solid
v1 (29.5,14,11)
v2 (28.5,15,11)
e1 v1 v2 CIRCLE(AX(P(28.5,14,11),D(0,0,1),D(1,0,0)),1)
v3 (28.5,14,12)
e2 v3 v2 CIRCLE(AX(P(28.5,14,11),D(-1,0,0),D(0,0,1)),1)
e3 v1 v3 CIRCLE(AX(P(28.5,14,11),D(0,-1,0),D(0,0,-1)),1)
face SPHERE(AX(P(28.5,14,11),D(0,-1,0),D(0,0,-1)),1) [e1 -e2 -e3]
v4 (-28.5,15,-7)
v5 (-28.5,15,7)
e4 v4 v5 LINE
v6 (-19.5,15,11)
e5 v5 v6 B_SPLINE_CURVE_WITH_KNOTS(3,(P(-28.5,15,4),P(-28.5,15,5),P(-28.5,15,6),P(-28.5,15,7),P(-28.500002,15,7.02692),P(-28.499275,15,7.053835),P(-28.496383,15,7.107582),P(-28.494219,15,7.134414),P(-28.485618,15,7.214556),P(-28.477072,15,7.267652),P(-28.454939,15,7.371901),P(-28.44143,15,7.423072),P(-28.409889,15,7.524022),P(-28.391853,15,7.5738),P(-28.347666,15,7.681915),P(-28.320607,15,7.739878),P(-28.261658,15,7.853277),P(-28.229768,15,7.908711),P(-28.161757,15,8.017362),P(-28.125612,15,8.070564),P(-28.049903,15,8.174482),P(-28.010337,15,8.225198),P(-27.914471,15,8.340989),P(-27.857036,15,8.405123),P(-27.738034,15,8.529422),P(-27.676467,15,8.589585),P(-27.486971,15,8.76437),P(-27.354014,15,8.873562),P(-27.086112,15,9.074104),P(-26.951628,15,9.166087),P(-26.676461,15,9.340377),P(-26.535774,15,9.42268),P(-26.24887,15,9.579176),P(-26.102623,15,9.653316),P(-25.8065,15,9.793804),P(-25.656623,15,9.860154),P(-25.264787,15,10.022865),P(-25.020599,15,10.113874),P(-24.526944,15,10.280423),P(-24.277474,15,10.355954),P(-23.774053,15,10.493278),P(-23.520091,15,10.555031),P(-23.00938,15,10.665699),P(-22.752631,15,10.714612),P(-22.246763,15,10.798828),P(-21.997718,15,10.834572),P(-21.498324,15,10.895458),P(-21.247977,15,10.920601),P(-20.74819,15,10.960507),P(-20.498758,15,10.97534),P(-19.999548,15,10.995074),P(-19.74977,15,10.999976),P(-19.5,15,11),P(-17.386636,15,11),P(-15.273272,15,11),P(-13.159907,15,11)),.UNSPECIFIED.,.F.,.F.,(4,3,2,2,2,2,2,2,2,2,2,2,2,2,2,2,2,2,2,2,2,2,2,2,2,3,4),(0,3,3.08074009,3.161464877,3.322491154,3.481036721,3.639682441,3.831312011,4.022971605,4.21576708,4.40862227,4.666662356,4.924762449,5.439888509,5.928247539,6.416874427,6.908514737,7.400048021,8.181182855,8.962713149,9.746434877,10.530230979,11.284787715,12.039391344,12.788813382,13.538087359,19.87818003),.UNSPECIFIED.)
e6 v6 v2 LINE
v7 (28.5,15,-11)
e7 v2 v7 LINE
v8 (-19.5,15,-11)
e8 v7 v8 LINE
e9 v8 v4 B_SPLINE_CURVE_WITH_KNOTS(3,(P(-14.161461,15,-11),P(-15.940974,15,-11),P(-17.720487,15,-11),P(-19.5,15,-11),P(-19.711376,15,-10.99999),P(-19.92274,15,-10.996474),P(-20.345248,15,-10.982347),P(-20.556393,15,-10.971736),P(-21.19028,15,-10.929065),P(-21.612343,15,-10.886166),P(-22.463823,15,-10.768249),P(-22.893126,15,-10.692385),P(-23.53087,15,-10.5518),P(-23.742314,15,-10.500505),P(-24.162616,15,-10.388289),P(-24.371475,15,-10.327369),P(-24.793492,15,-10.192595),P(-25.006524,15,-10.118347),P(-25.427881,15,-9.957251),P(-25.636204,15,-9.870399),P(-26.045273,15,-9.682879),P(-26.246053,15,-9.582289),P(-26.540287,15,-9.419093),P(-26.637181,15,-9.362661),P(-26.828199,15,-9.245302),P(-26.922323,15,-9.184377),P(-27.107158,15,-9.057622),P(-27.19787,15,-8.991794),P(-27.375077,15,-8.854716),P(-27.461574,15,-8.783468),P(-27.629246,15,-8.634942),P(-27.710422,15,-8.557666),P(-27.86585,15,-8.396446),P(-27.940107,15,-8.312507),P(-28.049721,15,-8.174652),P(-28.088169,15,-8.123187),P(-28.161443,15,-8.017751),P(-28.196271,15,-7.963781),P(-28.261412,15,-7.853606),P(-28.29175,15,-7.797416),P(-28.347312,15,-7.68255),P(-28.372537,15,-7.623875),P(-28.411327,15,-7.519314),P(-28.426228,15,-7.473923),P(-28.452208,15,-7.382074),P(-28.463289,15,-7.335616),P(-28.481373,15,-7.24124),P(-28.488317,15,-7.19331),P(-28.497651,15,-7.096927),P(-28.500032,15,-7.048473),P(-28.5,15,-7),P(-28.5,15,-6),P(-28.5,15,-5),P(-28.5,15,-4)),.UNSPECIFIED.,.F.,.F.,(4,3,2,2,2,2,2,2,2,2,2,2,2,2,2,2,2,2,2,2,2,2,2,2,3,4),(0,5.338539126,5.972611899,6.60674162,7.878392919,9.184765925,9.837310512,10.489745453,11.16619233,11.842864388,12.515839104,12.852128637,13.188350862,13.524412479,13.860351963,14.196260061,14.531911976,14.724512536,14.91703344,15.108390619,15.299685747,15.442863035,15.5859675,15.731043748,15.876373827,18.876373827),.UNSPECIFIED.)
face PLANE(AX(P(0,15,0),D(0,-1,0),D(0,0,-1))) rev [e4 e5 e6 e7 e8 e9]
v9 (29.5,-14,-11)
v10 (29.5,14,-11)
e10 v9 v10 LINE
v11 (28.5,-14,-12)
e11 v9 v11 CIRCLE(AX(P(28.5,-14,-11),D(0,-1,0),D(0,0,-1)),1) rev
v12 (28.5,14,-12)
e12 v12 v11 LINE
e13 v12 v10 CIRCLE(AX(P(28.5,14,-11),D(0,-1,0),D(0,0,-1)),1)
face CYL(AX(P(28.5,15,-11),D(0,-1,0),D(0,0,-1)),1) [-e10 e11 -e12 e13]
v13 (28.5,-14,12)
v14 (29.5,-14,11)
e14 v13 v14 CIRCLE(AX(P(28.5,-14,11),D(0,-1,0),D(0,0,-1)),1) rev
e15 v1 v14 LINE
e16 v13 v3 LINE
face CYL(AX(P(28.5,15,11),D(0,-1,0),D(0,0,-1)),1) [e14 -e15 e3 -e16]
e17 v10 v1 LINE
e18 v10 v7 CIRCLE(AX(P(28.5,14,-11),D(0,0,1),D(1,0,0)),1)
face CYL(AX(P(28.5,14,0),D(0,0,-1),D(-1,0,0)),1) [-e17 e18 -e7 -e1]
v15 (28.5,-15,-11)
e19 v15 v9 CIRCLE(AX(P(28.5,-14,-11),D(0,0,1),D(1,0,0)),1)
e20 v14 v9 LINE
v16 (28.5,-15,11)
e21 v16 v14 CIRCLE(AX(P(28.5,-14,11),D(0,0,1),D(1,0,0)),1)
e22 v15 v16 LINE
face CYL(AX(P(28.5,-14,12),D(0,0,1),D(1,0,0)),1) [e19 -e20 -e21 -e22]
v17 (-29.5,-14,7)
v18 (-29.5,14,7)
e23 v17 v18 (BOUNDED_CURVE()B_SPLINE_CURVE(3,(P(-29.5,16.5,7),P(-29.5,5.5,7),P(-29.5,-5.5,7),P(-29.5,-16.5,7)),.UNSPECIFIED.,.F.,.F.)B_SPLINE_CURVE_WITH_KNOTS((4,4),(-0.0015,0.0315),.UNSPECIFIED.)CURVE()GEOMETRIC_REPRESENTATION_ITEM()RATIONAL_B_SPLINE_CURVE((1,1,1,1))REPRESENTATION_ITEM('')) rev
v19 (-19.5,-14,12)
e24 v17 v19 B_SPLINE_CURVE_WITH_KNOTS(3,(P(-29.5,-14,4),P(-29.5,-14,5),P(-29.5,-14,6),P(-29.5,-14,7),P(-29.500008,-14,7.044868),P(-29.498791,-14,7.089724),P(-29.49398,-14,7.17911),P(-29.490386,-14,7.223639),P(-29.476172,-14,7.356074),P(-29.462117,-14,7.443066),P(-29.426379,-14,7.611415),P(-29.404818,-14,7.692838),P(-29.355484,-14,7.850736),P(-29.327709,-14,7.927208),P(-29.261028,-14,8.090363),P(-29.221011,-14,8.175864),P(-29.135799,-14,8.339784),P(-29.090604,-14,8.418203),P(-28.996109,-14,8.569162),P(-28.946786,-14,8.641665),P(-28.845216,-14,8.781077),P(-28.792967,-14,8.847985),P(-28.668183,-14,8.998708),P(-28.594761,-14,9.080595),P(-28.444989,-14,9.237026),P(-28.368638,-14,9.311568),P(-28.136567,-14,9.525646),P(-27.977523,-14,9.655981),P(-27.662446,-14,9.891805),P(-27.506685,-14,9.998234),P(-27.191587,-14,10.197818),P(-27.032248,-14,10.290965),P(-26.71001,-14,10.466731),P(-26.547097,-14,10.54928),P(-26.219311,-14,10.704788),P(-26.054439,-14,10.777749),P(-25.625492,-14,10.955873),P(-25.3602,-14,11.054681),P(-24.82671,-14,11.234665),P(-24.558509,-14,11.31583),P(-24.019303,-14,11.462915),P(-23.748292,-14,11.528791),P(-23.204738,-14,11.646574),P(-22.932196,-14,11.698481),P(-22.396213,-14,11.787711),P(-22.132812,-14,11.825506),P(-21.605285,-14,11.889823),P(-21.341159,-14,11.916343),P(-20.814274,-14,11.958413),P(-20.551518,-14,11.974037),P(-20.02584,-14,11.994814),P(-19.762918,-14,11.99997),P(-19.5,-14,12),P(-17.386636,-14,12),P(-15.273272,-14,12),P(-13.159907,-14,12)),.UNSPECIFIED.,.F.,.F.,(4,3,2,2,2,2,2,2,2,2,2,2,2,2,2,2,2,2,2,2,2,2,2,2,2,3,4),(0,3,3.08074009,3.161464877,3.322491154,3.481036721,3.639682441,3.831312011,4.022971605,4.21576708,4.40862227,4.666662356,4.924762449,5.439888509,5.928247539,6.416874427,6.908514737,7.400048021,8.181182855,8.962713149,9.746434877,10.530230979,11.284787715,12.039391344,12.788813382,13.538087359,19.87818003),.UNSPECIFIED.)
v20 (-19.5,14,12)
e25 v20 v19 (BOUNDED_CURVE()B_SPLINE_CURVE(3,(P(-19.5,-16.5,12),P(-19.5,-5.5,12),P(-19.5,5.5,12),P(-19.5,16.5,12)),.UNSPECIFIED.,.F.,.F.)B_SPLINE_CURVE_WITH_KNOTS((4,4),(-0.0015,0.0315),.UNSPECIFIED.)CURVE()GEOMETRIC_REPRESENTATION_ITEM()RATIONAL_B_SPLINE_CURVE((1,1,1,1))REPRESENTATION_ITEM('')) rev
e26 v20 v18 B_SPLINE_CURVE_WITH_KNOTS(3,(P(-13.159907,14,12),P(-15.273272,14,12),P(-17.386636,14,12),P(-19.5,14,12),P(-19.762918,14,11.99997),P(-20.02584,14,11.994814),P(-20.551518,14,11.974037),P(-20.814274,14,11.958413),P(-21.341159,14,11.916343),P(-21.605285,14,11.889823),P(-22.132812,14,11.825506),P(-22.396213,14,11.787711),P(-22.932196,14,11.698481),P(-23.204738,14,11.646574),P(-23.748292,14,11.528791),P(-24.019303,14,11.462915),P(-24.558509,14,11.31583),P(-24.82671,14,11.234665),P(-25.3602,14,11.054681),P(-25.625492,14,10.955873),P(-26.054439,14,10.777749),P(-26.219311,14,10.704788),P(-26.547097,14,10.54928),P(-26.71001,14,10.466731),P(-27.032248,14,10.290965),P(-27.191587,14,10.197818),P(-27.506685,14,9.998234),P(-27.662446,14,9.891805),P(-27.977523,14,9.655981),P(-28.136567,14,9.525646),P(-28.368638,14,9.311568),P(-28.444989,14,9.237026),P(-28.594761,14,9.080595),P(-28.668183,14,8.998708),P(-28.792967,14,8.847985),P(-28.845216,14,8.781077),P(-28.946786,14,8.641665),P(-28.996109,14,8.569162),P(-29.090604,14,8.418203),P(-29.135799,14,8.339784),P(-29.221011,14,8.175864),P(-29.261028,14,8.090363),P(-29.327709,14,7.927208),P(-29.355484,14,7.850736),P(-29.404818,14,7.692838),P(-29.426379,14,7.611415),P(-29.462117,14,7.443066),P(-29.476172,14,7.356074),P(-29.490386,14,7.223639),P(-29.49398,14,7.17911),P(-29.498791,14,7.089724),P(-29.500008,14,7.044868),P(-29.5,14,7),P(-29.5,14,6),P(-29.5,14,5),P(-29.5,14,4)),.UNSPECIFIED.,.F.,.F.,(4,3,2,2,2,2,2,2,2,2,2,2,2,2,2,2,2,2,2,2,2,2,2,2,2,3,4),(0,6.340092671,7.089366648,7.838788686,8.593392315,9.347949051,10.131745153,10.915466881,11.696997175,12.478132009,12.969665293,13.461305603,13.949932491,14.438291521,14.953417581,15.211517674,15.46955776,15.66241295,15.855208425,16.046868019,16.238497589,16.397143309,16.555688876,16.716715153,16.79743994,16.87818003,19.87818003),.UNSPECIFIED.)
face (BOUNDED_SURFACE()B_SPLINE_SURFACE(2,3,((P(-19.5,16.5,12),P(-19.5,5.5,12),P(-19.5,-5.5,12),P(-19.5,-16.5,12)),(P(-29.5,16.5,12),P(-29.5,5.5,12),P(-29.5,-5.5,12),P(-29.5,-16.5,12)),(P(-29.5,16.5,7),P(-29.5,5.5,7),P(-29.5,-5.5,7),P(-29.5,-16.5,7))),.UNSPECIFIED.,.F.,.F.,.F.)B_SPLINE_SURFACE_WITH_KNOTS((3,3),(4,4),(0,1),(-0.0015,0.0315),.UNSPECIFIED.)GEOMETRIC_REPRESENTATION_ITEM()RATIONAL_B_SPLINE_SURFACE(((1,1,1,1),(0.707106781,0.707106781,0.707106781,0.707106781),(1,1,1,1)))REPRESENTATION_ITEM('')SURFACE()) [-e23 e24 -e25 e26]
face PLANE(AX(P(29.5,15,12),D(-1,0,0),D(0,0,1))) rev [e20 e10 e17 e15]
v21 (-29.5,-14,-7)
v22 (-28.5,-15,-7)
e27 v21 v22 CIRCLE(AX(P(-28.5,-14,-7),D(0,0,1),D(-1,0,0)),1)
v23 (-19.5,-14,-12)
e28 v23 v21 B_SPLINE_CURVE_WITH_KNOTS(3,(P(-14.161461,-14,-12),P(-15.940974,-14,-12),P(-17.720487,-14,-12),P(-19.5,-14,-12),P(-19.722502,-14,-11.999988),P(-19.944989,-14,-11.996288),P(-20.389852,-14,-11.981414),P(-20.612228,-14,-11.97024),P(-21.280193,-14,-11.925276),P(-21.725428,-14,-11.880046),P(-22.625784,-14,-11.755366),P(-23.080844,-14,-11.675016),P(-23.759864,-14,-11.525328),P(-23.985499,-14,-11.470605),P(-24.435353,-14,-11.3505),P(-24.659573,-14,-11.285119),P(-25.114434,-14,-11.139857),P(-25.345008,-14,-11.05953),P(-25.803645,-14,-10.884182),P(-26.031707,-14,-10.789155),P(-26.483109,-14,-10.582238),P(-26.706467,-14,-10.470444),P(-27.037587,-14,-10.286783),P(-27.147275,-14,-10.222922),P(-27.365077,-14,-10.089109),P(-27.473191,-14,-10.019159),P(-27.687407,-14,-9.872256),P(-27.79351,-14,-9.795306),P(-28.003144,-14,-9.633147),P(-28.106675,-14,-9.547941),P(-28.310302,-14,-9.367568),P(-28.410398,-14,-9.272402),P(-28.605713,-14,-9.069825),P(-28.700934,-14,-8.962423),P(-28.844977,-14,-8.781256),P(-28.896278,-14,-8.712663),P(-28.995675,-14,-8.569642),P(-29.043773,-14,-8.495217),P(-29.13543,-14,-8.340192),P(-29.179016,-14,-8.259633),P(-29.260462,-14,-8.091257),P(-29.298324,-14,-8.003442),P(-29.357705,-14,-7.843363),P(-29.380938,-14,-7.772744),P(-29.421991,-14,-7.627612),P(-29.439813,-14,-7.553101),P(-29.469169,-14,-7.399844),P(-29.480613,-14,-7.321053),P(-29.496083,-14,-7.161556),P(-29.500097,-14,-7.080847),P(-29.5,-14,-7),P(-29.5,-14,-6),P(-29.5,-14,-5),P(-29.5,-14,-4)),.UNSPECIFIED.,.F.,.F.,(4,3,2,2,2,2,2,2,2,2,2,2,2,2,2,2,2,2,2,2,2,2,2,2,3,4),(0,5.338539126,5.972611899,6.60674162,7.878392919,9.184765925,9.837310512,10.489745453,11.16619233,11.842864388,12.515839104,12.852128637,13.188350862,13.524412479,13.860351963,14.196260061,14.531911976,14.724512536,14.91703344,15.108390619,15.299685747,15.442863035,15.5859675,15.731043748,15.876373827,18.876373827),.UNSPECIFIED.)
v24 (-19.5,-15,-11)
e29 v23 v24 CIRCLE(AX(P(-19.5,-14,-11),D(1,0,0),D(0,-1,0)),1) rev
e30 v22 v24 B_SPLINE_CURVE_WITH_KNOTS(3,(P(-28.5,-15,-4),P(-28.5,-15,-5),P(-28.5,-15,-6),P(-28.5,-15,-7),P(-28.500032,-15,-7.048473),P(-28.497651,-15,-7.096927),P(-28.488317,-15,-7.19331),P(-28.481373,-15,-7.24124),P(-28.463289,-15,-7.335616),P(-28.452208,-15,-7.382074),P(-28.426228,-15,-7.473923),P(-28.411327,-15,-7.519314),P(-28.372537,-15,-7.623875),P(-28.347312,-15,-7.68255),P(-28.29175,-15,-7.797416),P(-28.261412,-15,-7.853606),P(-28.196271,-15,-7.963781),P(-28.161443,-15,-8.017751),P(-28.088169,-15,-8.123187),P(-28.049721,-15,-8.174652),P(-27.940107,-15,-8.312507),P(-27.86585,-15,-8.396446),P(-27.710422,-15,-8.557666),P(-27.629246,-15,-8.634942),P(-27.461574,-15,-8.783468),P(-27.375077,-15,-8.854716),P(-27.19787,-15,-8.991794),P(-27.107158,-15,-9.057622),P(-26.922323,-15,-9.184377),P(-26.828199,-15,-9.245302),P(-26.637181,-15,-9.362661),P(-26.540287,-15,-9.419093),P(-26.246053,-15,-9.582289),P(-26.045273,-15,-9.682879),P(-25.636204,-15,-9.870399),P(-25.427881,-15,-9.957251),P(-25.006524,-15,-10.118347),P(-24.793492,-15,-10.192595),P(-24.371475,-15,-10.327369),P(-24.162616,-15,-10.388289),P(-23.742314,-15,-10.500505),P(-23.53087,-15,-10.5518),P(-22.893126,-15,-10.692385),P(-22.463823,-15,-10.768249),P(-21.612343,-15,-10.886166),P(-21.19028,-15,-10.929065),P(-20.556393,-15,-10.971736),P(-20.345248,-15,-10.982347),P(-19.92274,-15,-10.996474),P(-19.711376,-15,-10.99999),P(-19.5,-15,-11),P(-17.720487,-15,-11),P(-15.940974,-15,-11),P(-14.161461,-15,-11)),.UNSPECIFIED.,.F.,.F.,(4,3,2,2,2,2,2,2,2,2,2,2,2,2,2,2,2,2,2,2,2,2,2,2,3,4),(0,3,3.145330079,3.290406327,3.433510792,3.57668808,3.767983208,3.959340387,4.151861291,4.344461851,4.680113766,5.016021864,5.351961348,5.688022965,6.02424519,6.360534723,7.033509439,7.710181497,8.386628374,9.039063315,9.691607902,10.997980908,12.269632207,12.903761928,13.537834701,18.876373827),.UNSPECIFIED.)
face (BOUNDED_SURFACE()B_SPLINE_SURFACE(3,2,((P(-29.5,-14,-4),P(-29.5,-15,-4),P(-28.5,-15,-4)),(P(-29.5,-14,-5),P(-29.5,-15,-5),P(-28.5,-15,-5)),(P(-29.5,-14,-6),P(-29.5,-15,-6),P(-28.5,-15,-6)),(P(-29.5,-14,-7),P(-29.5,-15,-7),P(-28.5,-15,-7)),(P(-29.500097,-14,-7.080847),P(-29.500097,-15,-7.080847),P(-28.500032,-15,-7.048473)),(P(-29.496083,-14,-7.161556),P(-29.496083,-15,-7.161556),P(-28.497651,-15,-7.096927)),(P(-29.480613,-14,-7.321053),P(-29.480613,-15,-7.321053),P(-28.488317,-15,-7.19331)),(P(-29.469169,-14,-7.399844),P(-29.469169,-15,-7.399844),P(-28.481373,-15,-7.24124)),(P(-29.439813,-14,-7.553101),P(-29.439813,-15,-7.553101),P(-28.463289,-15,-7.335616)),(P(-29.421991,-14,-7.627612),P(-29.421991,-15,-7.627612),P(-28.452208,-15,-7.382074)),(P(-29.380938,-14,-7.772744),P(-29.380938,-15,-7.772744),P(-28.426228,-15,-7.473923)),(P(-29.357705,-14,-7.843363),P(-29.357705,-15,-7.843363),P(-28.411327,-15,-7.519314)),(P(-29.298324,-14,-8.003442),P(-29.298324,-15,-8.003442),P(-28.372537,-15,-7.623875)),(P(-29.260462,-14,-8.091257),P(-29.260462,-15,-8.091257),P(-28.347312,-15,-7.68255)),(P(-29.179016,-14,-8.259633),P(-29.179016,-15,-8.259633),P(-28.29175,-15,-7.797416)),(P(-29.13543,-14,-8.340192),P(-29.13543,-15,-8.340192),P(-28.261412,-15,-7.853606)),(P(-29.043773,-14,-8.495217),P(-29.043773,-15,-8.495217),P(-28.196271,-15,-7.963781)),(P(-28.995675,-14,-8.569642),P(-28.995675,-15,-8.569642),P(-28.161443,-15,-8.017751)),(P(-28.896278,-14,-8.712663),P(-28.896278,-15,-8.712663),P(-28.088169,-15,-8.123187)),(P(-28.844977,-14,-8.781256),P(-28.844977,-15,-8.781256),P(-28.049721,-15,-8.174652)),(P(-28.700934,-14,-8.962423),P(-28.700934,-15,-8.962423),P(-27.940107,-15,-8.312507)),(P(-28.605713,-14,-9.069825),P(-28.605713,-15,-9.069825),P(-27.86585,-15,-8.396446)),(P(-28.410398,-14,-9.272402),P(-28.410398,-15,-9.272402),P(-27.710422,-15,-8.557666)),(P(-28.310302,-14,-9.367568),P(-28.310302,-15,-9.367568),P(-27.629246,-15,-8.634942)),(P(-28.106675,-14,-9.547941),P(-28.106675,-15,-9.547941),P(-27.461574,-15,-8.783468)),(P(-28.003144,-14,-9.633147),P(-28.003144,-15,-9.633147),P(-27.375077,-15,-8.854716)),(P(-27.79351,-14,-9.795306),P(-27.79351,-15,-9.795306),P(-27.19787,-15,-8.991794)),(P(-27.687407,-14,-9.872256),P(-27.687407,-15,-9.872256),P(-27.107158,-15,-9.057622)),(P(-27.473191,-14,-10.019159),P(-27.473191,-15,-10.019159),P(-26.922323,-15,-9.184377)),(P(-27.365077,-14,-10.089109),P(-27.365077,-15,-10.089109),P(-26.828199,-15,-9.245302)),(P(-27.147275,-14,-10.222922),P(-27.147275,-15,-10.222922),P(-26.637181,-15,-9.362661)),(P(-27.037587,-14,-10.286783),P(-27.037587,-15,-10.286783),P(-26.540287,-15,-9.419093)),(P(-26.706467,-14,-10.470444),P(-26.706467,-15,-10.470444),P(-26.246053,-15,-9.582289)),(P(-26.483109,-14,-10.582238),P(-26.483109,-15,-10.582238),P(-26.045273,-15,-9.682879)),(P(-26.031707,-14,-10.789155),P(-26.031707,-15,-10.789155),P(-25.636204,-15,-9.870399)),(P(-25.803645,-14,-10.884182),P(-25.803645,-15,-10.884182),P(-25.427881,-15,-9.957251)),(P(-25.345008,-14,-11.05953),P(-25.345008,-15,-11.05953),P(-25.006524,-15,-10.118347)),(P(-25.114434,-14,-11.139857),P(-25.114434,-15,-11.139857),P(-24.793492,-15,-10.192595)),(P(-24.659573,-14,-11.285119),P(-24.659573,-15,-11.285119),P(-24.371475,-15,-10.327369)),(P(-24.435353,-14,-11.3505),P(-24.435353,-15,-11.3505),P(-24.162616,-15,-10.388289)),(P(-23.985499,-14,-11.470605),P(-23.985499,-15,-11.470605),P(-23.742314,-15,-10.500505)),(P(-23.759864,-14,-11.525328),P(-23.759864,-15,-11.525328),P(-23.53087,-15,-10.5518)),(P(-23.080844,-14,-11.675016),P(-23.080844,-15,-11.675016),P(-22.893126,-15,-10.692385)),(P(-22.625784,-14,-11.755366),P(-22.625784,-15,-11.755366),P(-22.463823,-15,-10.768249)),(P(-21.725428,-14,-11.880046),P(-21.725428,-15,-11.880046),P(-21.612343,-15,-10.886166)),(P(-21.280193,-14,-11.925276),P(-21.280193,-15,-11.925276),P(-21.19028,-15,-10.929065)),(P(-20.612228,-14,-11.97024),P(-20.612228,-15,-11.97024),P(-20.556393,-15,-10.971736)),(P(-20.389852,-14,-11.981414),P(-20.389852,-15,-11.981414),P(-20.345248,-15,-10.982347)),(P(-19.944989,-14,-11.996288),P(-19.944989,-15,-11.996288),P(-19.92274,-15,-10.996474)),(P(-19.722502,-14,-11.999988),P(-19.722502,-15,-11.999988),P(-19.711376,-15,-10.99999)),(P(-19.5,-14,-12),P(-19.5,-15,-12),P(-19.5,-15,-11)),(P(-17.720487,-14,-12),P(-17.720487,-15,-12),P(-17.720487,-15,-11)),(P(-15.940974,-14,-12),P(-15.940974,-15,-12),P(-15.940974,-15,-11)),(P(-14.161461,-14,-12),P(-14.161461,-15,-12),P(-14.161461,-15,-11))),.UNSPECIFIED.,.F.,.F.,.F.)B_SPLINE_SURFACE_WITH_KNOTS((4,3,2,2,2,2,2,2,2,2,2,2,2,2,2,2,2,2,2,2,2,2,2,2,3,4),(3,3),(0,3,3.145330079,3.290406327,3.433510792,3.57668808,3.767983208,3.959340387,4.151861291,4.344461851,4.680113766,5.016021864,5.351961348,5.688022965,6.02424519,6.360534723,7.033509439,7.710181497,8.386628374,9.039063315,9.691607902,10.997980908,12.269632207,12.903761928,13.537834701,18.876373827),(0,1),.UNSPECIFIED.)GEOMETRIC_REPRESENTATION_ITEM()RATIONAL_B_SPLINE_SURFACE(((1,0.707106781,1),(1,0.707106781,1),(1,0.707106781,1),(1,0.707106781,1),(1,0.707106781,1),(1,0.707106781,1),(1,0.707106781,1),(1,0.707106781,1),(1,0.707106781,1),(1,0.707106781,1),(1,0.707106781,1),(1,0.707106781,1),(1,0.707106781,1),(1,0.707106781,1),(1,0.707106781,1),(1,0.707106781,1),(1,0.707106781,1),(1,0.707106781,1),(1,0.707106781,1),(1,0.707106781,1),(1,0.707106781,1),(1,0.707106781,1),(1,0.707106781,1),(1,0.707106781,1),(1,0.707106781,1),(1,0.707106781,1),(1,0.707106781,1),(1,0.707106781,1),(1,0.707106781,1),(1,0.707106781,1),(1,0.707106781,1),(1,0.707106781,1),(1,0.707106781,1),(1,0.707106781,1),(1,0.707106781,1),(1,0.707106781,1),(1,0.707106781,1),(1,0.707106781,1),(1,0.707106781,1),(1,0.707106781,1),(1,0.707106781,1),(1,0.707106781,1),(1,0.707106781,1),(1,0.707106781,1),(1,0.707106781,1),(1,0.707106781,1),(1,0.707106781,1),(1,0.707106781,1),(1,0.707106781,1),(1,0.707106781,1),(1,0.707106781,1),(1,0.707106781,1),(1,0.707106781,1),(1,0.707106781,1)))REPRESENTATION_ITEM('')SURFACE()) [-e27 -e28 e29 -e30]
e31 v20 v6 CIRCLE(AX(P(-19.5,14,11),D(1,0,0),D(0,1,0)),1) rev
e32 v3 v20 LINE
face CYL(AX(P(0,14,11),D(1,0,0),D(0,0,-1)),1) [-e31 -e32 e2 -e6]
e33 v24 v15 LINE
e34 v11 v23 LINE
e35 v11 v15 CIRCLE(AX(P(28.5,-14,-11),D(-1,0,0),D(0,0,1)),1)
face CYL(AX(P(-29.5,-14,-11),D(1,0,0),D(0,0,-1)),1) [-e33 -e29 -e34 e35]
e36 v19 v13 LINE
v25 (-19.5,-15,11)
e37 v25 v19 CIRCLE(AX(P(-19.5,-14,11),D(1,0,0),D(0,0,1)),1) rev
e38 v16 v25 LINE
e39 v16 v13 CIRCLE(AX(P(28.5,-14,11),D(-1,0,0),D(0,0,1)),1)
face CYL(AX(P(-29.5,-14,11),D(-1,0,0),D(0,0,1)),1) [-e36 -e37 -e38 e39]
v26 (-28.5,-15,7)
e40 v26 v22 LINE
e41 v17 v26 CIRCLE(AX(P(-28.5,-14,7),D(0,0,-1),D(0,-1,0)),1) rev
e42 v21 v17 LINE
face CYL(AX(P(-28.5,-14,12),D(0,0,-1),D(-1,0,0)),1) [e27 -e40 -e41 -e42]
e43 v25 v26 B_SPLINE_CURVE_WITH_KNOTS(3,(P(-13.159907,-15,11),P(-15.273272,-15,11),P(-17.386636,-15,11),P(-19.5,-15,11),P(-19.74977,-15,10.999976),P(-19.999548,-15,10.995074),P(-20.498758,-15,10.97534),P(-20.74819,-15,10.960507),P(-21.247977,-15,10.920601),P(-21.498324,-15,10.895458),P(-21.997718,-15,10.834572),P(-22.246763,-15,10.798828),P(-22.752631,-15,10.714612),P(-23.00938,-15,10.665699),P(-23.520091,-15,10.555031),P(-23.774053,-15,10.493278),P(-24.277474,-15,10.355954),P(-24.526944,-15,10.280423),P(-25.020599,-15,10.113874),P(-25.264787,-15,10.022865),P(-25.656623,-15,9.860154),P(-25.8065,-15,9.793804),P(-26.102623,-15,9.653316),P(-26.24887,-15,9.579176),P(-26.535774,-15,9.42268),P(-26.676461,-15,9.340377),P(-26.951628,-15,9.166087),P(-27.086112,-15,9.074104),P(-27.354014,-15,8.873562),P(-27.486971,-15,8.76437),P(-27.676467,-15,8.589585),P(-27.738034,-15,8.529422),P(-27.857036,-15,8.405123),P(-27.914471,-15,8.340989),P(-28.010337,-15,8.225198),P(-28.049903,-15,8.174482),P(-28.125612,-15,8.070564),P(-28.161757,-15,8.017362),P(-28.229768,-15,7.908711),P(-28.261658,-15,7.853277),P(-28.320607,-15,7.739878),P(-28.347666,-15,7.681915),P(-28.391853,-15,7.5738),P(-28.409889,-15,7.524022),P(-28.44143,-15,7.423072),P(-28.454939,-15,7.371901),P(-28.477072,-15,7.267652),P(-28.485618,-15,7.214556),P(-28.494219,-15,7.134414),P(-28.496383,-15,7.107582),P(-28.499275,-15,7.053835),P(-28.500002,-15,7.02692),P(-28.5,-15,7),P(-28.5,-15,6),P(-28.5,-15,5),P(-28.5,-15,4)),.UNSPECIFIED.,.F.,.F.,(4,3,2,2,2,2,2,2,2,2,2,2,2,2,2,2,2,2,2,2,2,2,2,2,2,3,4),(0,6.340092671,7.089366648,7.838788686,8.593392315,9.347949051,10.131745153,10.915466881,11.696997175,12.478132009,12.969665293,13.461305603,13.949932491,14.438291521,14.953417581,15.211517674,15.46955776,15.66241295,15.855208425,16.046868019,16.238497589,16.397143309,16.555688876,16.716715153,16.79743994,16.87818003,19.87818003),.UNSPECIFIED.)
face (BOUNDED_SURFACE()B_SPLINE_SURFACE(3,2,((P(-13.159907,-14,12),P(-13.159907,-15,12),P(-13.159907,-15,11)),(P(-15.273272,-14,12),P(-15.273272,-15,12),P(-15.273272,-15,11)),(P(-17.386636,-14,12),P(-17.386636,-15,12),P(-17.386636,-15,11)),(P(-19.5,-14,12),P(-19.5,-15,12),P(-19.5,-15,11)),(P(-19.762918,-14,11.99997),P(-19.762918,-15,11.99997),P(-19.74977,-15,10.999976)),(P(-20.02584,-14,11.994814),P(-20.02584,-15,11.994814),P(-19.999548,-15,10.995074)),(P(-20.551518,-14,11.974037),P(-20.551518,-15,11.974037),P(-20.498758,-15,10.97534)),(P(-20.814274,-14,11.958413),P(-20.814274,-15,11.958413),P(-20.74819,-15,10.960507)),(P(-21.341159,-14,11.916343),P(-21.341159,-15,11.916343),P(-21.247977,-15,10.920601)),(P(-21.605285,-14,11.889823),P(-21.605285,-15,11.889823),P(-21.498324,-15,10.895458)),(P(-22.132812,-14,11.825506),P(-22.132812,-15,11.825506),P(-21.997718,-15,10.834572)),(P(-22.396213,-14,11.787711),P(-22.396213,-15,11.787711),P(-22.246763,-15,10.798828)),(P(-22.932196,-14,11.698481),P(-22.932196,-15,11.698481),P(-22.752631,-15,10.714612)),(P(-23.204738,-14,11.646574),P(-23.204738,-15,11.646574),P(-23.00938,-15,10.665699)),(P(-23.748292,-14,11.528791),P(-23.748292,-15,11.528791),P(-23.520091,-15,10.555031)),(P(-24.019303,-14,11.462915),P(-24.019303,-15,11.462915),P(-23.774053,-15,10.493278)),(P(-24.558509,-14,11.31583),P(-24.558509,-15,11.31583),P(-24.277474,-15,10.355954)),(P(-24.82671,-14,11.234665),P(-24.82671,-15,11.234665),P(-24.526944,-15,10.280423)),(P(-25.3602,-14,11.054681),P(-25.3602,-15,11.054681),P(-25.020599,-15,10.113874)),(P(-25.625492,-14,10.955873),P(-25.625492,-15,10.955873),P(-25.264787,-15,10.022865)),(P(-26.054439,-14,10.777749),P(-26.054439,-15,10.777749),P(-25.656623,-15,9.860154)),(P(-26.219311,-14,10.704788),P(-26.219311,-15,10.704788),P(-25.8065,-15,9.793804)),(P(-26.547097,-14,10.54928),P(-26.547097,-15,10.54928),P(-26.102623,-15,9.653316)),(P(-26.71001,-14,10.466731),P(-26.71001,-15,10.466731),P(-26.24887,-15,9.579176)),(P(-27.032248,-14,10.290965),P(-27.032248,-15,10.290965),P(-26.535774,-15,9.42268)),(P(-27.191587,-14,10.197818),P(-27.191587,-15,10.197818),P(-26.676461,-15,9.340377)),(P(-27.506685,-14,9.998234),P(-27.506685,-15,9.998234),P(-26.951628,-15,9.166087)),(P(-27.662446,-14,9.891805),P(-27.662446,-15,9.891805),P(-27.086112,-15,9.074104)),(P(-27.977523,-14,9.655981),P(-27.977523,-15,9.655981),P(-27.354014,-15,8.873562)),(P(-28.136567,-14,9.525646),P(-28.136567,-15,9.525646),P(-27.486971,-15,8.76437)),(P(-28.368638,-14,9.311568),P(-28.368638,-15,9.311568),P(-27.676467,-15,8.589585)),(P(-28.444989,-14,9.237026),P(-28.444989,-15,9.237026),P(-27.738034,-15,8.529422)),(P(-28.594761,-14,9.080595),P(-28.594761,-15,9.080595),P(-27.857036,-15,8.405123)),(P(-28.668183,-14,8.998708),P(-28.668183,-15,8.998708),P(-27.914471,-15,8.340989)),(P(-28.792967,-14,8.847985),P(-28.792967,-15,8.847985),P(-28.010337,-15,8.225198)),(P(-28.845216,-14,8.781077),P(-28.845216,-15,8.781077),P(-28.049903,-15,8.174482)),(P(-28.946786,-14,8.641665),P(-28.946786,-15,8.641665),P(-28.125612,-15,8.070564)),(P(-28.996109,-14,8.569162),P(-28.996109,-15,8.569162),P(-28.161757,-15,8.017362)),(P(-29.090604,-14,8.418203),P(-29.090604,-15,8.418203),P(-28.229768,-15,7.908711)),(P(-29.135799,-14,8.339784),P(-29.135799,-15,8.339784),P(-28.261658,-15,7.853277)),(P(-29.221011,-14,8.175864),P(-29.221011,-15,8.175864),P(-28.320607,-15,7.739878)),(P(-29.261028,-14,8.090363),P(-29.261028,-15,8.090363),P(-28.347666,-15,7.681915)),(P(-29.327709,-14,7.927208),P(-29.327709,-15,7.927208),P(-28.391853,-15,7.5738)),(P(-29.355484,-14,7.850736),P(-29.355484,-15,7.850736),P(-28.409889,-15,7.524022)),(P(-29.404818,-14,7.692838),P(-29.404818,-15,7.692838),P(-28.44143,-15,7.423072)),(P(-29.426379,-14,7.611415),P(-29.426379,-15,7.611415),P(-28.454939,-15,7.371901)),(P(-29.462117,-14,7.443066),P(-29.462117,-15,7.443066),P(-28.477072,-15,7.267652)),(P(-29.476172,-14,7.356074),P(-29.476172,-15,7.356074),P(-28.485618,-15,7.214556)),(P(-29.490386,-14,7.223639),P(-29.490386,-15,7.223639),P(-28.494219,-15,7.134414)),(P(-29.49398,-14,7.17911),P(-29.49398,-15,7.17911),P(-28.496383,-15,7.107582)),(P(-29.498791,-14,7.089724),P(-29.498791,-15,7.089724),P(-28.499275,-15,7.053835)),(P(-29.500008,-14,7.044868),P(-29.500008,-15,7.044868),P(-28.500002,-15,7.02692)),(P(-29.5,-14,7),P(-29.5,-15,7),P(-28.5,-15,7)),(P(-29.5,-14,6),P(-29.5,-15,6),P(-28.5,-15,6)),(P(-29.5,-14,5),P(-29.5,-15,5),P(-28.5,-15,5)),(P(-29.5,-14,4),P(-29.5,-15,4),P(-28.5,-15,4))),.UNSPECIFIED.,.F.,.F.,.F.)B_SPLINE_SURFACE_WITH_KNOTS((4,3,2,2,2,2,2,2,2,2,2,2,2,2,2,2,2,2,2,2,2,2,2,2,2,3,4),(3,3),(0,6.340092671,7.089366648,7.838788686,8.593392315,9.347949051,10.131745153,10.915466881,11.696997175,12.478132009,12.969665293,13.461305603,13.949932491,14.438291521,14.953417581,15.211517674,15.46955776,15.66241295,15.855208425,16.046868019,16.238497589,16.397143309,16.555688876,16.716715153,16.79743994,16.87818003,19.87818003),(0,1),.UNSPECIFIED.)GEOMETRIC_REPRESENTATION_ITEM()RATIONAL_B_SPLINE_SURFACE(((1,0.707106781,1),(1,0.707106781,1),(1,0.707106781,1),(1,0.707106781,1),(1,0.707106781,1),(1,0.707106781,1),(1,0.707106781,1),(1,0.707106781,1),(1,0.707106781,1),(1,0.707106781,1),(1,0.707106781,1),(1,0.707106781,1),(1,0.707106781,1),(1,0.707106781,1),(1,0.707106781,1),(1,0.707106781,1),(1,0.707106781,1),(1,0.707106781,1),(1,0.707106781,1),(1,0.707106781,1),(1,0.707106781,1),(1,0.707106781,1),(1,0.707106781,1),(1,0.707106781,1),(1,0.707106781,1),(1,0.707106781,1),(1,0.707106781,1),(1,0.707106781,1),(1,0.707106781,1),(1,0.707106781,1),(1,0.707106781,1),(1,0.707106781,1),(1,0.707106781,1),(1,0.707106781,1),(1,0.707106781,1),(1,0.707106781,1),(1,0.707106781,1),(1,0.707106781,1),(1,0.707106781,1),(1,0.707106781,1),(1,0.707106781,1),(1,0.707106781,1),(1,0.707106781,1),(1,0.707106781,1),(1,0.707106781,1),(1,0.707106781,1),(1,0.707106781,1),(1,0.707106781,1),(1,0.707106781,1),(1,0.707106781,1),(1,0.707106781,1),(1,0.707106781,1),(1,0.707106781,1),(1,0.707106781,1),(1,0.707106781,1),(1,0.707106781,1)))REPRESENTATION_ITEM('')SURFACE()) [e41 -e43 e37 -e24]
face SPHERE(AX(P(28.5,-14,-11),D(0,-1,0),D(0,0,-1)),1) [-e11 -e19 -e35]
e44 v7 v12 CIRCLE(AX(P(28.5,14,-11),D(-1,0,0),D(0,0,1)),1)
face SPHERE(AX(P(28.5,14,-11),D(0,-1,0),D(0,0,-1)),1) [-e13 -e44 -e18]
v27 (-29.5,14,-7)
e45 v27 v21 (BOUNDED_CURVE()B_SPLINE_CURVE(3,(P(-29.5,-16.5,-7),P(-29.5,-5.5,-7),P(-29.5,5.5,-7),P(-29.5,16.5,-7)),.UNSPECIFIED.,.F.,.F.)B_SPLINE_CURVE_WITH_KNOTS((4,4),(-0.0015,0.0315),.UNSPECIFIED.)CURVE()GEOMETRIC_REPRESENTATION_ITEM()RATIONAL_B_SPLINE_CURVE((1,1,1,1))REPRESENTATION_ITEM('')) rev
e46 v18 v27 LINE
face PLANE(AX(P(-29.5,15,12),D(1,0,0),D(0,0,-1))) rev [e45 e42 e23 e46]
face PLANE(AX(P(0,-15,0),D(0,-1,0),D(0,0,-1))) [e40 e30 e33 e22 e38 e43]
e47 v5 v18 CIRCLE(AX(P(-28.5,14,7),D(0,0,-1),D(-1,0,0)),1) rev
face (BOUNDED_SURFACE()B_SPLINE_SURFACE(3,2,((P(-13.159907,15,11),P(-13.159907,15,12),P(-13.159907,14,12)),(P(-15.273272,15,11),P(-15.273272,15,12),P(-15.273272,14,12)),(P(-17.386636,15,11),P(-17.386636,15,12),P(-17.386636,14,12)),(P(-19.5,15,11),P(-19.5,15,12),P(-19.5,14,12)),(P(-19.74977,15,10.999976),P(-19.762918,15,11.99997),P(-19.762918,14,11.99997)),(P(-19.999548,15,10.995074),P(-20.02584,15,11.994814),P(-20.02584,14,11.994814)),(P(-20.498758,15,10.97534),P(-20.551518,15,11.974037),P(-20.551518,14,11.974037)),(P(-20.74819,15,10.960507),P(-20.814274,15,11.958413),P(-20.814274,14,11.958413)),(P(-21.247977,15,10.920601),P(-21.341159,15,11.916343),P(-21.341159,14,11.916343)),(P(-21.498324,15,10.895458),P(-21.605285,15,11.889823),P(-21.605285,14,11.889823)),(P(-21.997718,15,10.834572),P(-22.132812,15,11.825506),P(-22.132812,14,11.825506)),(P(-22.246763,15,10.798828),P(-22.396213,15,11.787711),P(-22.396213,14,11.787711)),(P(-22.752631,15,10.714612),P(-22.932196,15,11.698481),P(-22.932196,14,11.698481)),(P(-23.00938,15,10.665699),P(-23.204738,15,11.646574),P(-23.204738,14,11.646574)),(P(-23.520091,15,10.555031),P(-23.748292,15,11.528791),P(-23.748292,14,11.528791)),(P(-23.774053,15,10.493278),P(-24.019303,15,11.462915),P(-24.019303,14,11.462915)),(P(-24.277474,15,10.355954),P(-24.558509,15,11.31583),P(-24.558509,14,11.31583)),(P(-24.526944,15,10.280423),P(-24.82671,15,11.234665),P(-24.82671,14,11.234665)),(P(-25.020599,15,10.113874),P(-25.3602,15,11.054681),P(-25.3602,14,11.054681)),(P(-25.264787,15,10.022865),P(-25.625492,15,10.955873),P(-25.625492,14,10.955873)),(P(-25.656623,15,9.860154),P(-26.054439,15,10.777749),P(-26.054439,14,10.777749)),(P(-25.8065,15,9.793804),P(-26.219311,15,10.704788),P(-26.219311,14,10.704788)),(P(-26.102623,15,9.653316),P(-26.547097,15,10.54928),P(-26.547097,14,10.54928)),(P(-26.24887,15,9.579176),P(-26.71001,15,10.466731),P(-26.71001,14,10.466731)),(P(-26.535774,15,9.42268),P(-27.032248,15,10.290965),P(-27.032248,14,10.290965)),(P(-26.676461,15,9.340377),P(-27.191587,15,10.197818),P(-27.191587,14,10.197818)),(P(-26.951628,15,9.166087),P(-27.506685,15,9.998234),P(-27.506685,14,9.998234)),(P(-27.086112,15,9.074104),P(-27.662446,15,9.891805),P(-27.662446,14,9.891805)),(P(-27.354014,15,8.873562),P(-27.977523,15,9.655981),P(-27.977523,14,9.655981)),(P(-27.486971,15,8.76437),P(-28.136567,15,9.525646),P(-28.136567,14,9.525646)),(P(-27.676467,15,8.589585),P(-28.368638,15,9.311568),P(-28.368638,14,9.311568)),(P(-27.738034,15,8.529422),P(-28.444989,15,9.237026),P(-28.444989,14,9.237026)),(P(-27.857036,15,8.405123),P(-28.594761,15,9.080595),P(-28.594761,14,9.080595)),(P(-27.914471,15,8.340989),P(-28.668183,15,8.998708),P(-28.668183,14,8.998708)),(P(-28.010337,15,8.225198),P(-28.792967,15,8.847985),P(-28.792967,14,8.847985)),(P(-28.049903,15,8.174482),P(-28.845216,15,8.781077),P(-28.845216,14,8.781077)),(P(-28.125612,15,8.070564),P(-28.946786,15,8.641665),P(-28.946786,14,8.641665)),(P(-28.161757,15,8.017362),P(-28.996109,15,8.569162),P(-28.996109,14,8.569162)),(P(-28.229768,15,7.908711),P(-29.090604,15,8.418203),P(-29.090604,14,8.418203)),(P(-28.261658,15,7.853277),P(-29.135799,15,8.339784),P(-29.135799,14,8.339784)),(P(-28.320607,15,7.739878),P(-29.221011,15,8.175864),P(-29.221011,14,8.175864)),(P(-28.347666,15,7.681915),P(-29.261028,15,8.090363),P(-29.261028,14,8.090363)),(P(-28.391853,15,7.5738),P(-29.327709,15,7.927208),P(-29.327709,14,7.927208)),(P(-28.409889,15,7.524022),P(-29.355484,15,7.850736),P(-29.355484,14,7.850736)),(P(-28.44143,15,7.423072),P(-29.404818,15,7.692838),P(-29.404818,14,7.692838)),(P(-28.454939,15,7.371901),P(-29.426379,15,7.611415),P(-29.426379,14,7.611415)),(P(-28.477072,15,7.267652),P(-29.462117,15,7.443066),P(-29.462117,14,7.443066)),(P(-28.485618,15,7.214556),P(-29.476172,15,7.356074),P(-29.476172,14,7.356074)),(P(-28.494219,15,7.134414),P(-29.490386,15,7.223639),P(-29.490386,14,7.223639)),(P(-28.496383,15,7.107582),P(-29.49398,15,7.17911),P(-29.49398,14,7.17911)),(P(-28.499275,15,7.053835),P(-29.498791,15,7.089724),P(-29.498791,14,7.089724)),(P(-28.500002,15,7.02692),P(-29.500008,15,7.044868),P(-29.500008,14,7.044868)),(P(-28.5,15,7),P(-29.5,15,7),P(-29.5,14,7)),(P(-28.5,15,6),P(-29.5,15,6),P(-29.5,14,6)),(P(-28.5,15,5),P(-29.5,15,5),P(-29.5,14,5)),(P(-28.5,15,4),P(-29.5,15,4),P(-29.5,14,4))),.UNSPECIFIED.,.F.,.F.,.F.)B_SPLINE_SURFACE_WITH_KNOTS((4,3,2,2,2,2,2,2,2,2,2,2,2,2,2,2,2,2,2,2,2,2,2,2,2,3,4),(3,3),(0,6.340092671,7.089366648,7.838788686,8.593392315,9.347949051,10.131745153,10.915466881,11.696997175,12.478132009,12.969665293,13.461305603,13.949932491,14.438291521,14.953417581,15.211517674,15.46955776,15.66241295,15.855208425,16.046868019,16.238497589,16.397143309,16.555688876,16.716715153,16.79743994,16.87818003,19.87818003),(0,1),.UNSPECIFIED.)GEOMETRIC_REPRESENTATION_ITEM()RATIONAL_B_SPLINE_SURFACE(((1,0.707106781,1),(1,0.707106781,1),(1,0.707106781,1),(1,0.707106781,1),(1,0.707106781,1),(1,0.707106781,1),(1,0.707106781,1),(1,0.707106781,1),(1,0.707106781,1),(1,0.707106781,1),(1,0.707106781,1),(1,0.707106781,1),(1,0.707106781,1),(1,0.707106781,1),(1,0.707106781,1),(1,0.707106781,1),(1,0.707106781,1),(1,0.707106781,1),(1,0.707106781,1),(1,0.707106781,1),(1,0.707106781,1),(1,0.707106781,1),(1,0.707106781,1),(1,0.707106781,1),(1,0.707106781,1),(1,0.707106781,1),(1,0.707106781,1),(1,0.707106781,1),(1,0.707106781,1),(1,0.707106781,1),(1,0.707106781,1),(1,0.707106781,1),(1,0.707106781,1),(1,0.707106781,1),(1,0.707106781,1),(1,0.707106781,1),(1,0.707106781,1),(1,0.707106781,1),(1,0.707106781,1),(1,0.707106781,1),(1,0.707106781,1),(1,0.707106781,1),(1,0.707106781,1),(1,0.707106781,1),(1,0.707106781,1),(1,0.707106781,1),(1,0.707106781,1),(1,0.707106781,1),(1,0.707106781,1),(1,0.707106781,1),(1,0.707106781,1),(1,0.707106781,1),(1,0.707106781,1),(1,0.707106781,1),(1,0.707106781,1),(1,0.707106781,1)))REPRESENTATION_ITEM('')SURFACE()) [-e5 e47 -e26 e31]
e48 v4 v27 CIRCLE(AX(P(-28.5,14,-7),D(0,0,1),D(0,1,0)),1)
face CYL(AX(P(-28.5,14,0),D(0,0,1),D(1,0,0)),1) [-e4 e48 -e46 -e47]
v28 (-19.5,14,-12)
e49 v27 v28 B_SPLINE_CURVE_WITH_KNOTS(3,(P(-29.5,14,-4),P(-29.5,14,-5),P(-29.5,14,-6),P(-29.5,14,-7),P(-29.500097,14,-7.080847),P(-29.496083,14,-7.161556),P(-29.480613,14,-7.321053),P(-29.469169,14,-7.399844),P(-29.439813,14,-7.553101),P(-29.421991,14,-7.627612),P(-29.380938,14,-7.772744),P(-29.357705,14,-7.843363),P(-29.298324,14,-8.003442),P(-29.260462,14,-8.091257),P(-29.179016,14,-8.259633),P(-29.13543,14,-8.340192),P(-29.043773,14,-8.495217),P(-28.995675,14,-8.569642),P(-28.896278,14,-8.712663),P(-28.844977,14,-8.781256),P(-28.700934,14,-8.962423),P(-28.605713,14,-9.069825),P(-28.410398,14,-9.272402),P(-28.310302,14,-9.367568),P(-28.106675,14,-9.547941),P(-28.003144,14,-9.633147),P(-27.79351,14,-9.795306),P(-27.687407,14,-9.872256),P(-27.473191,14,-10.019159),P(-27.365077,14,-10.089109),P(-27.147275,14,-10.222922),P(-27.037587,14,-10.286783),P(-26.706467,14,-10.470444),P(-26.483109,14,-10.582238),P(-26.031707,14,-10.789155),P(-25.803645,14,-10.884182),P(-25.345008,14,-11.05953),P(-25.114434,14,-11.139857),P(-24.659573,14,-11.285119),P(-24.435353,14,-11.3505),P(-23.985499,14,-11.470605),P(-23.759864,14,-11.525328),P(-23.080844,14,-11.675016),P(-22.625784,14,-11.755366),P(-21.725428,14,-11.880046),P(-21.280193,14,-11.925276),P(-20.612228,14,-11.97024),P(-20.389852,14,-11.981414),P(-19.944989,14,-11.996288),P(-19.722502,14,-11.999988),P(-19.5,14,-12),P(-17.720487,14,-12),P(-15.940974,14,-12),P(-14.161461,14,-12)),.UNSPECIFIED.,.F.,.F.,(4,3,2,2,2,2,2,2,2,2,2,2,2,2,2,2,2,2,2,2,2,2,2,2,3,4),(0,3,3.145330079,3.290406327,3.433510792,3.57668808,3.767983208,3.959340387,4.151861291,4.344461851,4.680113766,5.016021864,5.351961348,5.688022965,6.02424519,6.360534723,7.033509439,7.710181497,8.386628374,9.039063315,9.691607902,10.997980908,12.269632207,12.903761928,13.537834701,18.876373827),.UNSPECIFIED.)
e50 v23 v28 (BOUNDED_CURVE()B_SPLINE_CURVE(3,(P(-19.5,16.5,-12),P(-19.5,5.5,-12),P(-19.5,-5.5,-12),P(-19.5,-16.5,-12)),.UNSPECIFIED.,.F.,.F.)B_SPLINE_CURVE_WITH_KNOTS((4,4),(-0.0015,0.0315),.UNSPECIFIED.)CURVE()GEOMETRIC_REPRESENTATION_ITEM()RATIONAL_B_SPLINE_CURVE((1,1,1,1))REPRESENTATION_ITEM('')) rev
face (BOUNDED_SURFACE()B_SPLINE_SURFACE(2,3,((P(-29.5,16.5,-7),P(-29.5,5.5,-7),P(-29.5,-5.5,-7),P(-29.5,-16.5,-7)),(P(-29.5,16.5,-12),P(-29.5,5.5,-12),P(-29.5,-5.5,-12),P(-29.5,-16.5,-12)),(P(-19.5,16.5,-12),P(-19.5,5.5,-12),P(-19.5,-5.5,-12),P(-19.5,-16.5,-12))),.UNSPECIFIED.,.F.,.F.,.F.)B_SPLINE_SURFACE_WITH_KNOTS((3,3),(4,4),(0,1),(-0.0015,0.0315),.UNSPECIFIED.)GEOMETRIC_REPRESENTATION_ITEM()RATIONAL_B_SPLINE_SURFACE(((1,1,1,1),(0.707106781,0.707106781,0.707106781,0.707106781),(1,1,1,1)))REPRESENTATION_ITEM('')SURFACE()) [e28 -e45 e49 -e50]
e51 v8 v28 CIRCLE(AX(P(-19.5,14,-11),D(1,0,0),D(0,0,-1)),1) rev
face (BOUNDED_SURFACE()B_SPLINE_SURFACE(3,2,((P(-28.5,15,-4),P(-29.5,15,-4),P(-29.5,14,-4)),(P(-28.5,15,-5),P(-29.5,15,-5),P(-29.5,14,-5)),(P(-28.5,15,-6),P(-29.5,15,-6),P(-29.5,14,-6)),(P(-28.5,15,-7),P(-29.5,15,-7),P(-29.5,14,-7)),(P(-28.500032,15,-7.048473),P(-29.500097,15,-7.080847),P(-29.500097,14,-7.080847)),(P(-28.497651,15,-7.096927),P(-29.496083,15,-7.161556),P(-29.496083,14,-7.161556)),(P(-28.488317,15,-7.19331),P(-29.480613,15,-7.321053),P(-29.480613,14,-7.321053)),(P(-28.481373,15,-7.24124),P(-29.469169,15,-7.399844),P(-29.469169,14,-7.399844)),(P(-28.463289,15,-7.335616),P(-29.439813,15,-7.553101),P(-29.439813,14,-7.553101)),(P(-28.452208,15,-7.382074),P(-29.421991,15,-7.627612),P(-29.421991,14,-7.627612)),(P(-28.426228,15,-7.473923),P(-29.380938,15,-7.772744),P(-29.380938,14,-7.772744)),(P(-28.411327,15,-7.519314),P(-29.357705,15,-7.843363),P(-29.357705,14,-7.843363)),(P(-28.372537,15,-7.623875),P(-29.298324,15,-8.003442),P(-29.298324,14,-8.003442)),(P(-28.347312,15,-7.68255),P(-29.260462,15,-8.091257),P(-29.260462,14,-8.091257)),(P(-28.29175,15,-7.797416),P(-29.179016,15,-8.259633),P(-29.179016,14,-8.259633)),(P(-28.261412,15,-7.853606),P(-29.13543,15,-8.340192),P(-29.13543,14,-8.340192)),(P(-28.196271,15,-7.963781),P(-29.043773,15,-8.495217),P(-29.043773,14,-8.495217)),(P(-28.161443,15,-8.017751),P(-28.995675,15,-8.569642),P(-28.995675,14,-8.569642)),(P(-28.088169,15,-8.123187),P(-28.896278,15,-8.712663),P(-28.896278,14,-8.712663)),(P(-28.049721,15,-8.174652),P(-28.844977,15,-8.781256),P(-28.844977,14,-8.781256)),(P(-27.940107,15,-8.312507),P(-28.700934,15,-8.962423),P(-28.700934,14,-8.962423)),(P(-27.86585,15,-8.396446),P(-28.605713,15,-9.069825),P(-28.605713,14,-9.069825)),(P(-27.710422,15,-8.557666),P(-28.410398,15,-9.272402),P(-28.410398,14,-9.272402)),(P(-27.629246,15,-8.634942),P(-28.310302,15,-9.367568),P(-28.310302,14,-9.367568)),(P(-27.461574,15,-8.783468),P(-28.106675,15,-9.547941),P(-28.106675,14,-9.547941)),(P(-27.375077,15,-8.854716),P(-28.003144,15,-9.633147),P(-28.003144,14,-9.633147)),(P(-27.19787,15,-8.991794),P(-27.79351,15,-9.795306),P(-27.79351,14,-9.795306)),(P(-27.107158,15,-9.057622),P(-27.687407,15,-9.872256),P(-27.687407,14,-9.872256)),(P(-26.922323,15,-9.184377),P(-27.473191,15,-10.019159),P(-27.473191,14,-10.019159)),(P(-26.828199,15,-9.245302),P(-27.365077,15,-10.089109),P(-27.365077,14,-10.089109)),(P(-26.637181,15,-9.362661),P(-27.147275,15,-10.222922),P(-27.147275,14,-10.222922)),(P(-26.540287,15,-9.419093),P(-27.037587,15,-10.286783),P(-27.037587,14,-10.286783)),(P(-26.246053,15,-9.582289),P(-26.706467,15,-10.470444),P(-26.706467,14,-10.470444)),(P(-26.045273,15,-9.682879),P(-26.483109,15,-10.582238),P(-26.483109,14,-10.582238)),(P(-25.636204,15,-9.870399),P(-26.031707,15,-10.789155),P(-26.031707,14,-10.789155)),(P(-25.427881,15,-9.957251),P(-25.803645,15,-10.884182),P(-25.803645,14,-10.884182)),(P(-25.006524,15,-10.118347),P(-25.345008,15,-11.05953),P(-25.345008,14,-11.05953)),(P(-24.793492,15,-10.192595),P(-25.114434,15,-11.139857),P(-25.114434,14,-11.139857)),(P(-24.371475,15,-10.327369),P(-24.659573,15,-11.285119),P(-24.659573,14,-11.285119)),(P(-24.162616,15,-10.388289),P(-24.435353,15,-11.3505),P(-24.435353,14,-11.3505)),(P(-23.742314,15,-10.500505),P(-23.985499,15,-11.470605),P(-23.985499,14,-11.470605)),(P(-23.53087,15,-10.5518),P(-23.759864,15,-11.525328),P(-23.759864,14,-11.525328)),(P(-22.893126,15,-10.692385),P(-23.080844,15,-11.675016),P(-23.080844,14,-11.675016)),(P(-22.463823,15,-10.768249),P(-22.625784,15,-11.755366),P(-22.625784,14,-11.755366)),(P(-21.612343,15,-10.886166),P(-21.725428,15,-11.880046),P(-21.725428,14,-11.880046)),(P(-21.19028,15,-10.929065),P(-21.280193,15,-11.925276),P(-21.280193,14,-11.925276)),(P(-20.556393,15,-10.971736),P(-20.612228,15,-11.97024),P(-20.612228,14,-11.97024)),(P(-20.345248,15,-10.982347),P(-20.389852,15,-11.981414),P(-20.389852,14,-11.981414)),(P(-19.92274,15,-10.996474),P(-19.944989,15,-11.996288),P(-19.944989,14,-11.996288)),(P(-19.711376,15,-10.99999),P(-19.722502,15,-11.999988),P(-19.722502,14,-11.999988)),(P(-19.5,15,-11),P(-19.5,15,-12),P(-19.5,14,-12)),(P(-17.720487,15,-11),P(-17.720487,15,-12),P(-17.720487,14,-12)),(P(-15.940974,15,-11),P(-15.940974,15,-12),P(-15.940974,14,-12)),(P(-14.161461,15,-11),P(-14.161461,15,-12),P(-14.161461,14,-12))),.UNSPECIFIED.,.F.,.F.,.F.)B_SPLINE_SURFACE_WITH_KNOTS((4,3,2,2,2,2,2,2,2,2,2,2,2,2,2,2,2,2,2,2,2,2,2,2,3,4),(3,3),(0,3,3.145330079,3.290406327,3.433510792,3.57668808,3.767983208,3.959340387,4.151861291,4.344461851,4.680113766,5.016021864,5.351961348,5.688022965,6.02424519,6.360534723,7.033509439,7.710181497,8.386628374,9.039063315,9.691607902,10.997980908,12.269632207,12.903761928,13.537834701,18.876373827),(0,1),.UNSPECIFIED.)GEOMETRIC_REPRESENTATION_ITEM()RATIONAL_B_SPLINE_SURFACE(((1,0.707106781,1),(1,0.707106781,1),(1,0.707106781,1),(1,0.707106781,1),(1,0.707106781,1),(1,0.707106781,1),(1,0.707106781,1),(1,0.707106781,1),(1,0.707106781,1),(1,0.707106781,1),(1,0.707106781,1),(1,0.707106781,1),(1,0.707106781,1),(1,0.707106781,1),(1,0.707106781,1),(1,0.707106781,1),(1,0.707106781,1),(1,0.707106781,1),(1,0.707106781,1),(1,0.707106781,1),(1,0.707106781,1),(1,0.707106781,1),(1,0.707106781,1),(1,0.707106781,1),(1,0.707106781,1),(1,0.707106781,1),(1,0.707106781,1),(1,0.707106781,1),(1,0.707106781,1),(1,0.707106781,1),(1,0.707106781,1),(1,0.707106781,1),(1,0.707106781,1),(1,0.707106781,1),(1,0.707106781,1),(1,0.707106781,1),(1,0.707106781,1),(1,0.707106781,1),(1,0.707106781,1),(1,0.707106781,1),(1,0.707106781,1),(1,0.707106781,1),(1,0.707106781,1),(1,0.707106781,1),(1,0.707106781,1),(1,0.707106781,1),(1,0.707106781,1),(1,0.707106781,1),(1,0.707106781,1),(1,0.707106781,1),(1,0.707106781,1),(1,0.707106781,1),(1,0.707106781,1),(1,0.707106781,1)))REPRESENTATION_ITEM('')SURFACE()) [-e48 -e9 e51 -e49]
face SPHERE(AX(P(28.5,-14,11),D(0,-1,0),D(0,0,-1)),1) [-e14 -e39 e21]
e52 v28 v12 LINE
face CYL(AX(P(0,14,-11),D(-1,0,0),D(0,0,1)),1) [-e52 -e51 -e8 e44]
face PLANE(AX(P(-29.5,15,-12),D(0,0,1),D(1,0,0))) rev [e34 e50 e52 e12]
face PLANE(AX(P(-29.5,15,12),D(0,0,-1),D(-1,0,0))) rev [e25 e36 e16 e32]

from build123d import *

# Parameters (mm, degrees)
SKETCH1_W           = 59
SKETCH1_H           = 24
BOSS_EXTRUDE1_DEPTH = 15
FILLET1_R           = 1
FILLET2_SIZE        = 5
FILLET2_SIZE_2      = 10
FILLET3_R           = 1


with BuildPart() as part:
    # Sketch1 → Boss-Extrude1 (new, symmetric)
    with BuildSketch(Plane(origin=(0, 0, 0), x_dir=(1, 0, 0), z_dir=(0, 1, 0))):
        Rectangle(SKETCH1_W, SKETCH1_H)
    extrude(amount=BOSS_EXTRUDE1_DEPTH, both=True)

    # Fillet1
    fillet1_edges = [part.edges().sort_by_distance(p)[0] for p in [
        (29.5, 0, 12),
        (29.5, 0, -12),
    ]]
    fillet(fillet1_edges, radius=FILLET1_R)

    # Fillet2
    # an asymmetric fillet: 10, 5 mm, written as the material it takes off along each edge
    with BuildSketch(Plane(origin=(-29.5, 40, -12), x_dir=(0, 0, 1), z_dir=(0, -1, 0))) as fillet2_piece_1:
        with BuildLine():
            Bezier((FILLET2_SIZE, 0), (0, 0), (0, -FILLET2_SIZE_2), weights=[1, 0.707106781, 1])
            Line((0, -FILLET2_SIZE_2), (0, 0))
            Line((0, 0), (FILLET2_SIZE, 0))
        make_face()
    extrude(amount=80, mode=Mode.SUBTRACT)
    with BuildSketch(Plane(origin=(-29.5, 40, 12), x_dir=(1, 0, 0), z_dir=(0, -1, 0))) as fillet2_piece_2:
        with BuildLine():
            Bezier((FILLET2_SIZE_2, 0), (0, 0), (0, -FILLET2_SIZE), weights=[1, 0.707106781, 1])
            Line((0, -FILLET2_SIZE), (0, 0))
            Line((0, 0), (FILLET2_SIZE_2, 0))
        make_face()
    extrude(amount=80, mode=Mode.SUBTRACT)

    # Fillet3
    fillet3_edges = [part.edges().sort_by_distance(p)[0] for p in [
        (-25.444718917, -15, 11.02058196),
        (-29.5, -15, 0),
        (-25.444718915, -15, -11.020581957),
        (4.5, -15, -12),
        (29.207106781, -15, -11.707106781),
        (29.5, -15, 0),
        (29.207106781, -15, 11.707106781),
        (-25.444718917, 15, 11.02058196),
        (-29.5, 15, 0),
        (-25.444718915, 15, -11.020581957),
        (4.5, 15, -12),
        (29.207106781, 15, -11.707106781),
        (29.5, 15, 0),
        (29.207106781, 15, 11.707106781),
        (4.5, -15, 12),
        (4.5, 15, 12),
    ]]
    fillet(fillet3_edges, radius=FILLET3_R)


solid = part.part
